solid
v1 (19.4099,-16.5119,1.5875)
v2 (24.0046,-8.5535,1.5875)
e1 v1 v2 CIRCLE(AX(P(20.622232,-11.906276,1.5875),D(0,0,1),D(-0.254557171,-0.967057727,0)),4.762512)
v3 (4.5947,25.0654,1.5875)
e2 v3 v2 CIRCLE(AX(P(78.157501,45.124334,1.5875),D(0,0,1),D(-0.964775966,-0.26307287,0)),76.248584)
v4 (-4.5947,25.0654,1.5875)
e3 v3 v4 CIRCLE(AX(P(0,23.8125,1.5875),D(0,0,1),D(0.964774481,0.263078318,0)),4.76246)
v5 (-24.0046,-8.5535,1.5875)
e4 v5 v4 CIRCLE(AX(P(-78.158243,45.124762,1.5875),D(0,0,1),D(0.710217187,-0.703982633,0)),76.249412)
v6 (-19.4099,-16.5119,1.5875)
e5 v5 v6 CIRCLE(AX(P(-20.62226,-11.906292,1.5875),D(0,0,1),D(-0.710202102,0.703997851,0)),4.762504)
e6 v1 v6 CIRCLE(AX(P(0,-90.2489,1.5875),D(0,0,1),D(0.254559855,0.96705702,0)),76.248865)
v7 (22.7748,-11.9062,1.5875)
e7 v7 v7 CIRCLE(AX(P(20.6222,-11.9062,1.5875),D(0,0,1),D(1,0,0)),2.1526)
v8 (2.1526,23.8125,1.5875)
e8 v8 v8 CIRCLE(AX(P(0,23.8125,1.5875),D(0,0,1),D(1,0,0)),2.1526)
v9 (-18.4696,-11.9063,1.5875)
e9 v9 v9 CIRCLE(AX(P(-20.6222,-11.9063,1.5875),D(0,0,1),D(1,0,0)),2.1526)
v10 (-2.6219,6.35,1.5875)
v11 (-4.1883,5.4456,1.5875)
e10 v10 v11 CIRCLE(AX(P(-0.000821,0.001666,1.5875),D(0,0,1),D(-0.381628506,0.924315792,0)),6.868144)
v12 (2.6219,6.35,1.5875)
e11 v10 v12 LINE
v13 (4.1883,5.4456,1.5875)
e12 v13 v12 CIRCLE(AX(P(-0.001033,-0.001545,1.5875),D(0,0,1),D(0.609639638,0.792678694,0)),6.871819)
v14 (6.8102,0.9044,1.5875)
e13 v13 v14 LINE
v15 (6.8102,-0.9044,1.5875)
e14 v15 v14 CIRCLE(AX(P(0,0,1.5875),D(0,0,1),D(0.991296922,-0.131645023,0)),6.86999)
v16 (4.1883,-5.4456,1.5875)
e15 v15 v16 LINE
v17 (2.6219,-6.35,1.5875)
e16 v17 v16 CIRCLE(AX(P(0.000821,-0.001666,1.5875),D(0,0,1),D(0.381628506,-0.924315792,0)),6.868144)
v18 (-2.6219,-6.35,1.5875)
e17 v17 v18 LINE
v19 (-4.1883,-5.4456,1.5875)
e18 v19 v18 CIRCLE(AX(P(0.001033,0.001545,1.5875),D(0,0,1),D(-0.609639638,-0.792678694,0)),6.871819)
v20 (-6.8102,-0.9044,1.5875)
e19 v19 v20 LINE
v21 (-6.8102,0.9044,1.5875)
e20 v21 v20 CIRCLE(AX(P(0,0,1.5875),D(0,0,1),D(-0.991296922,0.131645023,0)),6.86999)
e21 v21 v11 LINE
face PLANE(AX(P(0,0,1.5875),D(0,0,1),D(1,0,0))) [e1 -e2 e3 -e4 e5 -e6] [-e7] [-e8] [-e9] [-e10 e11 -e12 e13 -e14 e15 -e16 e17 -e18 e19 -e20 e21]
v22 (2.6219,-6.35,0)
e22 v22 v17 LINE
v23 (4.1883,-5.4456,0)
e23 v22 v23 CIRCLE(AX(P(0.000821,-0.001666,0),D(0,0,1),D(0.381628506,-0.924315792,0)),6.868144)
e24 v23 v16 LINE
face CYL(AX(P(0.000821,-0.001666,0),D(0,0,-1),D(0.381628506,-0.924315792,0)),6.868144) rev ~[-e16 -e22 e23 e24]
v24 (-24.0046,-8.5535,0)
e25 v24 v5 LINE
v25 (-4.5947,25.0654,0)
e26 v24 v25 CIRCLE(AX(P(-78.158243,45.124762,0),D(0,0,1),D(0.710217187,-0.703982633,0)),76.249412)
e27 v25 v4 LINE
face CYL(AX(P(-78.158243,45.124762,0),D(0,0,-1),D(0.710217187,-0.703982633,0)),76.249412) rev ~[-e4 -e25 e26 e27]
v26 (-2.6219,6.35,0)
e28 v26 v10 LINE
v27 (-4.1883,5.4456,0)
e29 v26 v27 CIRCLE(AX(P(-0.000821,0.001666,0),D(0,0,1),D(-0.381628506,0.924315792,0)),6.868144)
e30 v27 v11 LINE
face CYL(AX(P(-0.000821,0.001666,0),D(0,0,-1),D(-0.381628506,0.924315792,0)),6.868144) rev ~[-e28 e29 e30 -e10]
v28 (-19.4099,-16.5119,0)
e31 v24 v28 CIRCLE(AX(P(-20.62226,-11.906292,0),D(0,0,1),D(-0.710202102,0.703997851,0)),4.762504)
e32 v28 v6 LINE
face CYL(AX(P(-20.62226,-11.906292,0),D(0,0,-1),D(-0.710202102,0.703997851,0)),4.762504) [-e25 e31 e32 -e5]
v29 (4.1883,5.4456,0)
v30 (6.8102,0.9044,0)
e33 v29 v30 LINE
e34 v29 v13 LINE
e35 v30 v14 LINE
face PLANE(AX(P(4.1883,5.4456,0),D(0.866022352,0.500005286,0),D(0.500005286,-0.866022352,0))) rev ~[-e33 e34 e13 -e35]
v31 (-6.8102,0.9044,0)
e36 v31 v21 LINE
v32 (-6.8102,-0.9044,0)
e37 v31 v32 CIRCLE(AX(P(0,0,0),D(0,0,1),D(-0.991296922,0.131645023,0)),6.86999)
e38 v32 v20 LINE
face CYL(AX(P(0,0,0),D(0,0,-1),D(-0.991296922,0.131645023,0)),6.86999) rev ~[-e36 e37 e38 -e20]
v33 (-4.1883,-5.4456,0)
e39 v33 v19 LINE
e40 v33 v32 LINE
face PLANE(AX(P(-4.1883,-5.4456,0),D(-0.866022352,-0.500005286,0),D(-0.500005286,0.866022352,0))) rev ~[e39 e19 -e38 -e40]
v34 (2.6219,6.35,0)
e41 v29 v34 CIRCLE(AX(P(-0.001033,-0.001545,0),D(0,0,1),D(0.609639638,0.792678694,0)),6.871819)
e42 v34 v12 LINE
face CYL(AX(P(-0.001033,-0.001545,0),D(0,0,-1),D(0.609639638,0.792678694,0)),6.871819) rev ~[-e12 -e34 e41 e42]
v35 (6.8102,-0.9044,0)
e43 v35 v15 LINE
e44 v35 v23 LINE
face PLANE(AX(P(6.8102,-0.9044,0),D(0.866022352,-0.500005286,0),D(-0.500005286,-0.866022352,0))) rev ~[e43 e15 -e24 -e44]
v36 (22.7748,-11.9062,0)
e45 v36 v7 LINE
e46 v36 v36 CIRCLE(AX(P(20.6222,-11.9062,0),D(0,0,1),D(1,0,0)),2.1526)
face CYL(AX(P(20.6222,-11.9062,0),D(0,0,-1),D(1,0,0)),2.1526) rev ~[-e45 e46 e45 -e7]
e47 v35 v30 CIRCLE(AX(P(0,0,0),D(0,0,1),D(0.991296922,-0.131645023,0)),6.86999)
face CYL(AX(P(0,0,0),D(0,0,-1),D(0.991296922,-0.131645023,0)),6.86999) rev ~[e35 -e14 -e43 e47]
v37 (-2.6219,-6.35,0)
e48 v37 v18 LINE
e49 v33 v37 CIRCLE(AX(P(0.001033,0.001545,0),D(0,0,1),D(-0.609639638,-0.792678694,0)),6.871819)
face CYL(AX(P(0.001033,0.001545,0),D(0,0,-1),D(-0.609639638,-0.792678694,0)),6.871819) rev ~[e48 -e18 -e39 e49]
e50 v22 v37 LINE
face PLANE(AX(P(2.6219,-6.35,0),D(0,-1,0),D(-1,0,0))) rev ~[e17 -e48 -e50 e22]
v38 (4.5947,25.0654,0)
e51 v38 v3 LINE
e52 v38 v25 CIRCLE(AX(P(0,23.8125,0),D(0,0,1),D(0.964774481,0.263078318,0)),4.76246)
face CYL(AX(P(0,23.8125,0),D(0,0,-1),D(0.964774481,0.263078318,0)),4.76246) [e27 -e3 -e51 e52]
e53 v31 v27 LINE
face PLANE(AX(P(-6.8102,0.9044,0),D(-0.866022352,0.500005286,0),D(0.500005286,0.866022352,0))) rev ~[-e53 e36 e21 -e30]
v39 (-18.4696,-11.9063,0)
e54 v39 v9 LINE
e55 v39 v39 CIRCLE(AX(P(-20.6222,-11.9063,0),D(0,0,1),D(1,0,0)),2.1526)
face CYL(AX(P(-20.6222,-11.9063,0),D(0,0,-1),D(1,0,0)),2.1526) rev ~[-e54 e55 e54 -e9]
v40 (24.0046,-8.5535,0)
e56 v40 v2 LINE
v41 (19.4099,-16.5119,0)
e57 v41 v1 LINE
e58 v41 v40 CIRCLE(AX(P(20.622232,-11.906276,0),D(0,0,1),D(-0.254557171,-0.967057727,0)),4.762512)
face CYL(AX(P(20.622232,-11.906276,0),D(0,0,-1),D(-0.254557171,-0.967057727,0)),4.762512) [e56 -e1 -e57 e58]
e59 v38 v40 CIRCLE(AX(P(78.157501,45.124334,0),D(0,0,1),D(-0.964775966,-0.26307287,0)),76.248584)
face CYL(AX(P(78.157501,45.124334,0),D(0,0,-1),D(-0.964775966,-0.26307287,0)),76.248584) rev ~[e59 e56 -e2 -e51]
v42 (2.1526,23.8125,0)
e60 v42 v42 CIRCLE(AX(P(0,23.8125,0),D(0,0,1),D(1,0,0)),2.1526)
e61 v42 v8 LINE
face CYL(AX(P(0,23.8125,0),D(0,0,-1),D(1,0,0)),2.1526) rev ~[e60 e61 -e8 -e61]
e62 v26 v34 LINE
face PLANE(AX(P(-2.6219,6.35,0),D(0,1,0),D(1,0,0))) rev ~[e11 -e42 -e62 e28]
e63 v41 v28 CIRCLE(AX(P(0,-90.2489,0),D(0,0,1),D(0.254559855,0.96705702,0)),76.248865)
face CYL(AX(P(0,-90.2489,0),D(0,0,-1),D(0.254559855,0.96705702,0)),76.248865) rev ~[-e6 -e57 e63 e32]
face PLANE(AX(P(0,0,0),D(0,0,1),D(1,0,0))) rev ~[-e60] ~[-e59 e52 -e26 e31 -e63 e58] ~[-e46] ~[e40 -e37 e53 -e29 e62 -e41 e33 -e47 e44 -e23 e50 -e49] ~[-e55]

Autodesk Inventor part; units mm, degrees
ref_plane "YZ Plane" through (0, 0, 0) normal (1, 0, 0) x (0, 1, 0)
ref_plane "XZ Plane" through (0, 0, 0) normal (0, 1, 0) x (-1, 0, 0)
ref_plane "XY Plane" through (0, 0, 0) normal (0, 0, 1) x (1, 0, 0)
sketch "VersaHex Adapter Hole" plane through (0, 0, 0) normal (0, 0, 1) x (1, 0, 0)
  line L0 (-2.6931, -2.4859) -> (-0.0712, 2.0554)
  arc A0 (1.4952, 2.9597) -> (-0.0712, 2.0554) centre (4.1171, -3.3903) ccw
  line L1 (1.4952, 2.9597) -> (6.7391, 2.9597)
  arc A1 (8.3055, 2.0554) -> (6.7391, 2.9597) centre (4.1171, -3.3903) ccw
  line L2 (8.3055, 2.0554) -> (10.9274, -2.4859)
  arc A2 (10.9274, -4.2946) -> (10.9274, -2.4859) centre (4.1171, -3.3903) ccw
  line L3 (10.9274, -4.2946) -> (8.3055, -8.8359)
  arc A3 (6.7391, -9.7403) -> (8.3055, -8.8359) centre (4.1171, -3.3903) ccw
  line L4 (6.7391, -9.7403) -> (1.4952, -9.7403)
  arc A4 (-0.0712, -8.8359) -> (1.4952, -9.7403) centre (4.1171, -3.3903) ccw
  line L5 (-0.0712, -8.8359) -> (-2.6931, -4.2946)
  arc A5 (-2.6931, -2.4859) -> (-2.6931, -4.2946) centre (4.1171, -3.3903) ccw
  point P0 (3.8427, -3.1642)
  point P1 (0, 3.175)
  point P2 (0, -3.175)
  point P3 (0, 0)
sketch "Block2" plane through (0, 0, 0) normal (0, 0, 1) x (1, 0, 0)
  line L0 (30.4112, -18.6542) -> (33.0331, -14.1129)
  arc A0 (34.5995, -13.2085) -> (33.0331, -14.1129) centre (37.2214, -19.5585) ccw
  line L1 (34.5995, -13.2085) -> (39.8433, -13.2085)
  arc A1 (41.4097, -14.1129) -> (39.8433, -13.2085) centre (37.2214, -19.5585) ccw
  line L2 (41.4097, -14.1129) -> (44.0316, -18.6542)
  arc A2 (44.0316, -20.4629) -> (44.0316, -18.6542) centre (37.2214, -19.5585) ccw
  line L3 (44.0316, -20.4629) -> (41.4097, -25.0042)
  arc A3 (39.8433, -25.9085) -> (41.4097, -25.0042) centre (37.2214, -19.5585) ccw
  line L4 (39.8433, -25.9085) -> (34.5995, -25.9085)
  arc A4 (33.0331, -25.0042) -> (34.5995, -25.9085) centre (37.2214, -19.5585) ccw
  line L5 (33.0331, -25.0042) -> (30.4112, -20.4629)
  arc A5 (30.4112, -18.6542) -> (30.4112, -20.4629) centre (37.2214, -19.5585) ccw
  point P0 (37.2214, -19.5585)
sketch "Sketch1" plane through (0, 0, 0) normal (0, 0, 1) x (1, 0, 0)
  circle A0 centre (-20.6222, -11.9063) radius 2.1526
  circle A1 centre (20.6222, -11.9062) radius 2.1526
  circle A2 centre (0, 23.8125) radius 2.1526
  arc A3 (-24.0046, -8.5535) -> (-19.4099, -16.5119) centre (-20.6222, -11.9063) ccw
  arc A4 (19.4099, -16.5119) -> (24.0046, -8.5535) centre (20.6222, -11.9062) ccw
  arc A5 (4.5947, 25.0654) -> (-4.5947, 25.0654) centre (0, 23.8125) ccw
  arc A6 (19.4099, -16.5119) -> (-19.4099, -16.5119) centre (0, -90.2489) ccw
  arc A7 (-24.0046, -8.5535) -> (-4.5947, 25.0654) centre (-78.1579, 45.1245) ccw
  arc A8 (4.5947, 25.0654) -> (24.0046, -8.5535) centre (78.1579, 45.1245) ccw
  line L0 (-6.8102, 0.9044) -> (-4.1883, 5.4456)
  arc A9 (-2.6219, 6.35) -> (-4.1883, 5.4456) centre (0, 0) ccw
  line L1 (-2.6219, 6.35) -> (2.6219, 6.35)
  arc A10 (4.1883, 5.4456) -> (2.6219, 6.35) centre (0, 0) ccw
  line L2 (4.1883, 5.4456) -> (6.8102, 0.9044)
  arc A11 (6.8102, -0.9044) -> (6.8102, 0.9044) centre (0, 0) ccw
  line L3 (6.8102, -0.9044) -> (4.1883, -5.4456)
  arc A12 (2.6219, -6.35) -> (4.1883, -5.4456) centre (0, 0) ccw
  line L4 (2.6219, -6.35) -> (-2.6219, -6.35)
  arc A13 (-4.1883, -5.4456) -> (-2.6219, -6.35) centre (0, 0) ccw
  line L5 (-4.1883, -5.4456) -> (-6.8102, -0.9044)
  arc A14 (-6.8102, 0.9044) -> (-6.8102, -0.9044) centre (0, 0) ccw
  dimension "d5" = 9.525
  dimension "d6" = 9.525
  dimension "d7" = 9.525
extrude "Extrusion1" add sketch "Sketch1" along normal blind 1.5875
equation "\"BendRadius\" = Thickness"
equation "\"BendReliefWidth\" = Thickness"
equation "\"BendReliefDepth\" = 0.5 * Thickness"
equation "\"CornerReliefSize\" = 4 * Thickness"
equation "\"MinimumRemnant\" = 2 * Thickness"
equation "\"TransitionRadius\" = BendRadius"
equation "\"JacobiRadiusSize\" = BendRadius"
equation "\"GapSize\" = Thickness"
equation "\"Thickness\" = 1.5875"
properties part number "flex_wheel_hub" material "Acetal Resin, White"
